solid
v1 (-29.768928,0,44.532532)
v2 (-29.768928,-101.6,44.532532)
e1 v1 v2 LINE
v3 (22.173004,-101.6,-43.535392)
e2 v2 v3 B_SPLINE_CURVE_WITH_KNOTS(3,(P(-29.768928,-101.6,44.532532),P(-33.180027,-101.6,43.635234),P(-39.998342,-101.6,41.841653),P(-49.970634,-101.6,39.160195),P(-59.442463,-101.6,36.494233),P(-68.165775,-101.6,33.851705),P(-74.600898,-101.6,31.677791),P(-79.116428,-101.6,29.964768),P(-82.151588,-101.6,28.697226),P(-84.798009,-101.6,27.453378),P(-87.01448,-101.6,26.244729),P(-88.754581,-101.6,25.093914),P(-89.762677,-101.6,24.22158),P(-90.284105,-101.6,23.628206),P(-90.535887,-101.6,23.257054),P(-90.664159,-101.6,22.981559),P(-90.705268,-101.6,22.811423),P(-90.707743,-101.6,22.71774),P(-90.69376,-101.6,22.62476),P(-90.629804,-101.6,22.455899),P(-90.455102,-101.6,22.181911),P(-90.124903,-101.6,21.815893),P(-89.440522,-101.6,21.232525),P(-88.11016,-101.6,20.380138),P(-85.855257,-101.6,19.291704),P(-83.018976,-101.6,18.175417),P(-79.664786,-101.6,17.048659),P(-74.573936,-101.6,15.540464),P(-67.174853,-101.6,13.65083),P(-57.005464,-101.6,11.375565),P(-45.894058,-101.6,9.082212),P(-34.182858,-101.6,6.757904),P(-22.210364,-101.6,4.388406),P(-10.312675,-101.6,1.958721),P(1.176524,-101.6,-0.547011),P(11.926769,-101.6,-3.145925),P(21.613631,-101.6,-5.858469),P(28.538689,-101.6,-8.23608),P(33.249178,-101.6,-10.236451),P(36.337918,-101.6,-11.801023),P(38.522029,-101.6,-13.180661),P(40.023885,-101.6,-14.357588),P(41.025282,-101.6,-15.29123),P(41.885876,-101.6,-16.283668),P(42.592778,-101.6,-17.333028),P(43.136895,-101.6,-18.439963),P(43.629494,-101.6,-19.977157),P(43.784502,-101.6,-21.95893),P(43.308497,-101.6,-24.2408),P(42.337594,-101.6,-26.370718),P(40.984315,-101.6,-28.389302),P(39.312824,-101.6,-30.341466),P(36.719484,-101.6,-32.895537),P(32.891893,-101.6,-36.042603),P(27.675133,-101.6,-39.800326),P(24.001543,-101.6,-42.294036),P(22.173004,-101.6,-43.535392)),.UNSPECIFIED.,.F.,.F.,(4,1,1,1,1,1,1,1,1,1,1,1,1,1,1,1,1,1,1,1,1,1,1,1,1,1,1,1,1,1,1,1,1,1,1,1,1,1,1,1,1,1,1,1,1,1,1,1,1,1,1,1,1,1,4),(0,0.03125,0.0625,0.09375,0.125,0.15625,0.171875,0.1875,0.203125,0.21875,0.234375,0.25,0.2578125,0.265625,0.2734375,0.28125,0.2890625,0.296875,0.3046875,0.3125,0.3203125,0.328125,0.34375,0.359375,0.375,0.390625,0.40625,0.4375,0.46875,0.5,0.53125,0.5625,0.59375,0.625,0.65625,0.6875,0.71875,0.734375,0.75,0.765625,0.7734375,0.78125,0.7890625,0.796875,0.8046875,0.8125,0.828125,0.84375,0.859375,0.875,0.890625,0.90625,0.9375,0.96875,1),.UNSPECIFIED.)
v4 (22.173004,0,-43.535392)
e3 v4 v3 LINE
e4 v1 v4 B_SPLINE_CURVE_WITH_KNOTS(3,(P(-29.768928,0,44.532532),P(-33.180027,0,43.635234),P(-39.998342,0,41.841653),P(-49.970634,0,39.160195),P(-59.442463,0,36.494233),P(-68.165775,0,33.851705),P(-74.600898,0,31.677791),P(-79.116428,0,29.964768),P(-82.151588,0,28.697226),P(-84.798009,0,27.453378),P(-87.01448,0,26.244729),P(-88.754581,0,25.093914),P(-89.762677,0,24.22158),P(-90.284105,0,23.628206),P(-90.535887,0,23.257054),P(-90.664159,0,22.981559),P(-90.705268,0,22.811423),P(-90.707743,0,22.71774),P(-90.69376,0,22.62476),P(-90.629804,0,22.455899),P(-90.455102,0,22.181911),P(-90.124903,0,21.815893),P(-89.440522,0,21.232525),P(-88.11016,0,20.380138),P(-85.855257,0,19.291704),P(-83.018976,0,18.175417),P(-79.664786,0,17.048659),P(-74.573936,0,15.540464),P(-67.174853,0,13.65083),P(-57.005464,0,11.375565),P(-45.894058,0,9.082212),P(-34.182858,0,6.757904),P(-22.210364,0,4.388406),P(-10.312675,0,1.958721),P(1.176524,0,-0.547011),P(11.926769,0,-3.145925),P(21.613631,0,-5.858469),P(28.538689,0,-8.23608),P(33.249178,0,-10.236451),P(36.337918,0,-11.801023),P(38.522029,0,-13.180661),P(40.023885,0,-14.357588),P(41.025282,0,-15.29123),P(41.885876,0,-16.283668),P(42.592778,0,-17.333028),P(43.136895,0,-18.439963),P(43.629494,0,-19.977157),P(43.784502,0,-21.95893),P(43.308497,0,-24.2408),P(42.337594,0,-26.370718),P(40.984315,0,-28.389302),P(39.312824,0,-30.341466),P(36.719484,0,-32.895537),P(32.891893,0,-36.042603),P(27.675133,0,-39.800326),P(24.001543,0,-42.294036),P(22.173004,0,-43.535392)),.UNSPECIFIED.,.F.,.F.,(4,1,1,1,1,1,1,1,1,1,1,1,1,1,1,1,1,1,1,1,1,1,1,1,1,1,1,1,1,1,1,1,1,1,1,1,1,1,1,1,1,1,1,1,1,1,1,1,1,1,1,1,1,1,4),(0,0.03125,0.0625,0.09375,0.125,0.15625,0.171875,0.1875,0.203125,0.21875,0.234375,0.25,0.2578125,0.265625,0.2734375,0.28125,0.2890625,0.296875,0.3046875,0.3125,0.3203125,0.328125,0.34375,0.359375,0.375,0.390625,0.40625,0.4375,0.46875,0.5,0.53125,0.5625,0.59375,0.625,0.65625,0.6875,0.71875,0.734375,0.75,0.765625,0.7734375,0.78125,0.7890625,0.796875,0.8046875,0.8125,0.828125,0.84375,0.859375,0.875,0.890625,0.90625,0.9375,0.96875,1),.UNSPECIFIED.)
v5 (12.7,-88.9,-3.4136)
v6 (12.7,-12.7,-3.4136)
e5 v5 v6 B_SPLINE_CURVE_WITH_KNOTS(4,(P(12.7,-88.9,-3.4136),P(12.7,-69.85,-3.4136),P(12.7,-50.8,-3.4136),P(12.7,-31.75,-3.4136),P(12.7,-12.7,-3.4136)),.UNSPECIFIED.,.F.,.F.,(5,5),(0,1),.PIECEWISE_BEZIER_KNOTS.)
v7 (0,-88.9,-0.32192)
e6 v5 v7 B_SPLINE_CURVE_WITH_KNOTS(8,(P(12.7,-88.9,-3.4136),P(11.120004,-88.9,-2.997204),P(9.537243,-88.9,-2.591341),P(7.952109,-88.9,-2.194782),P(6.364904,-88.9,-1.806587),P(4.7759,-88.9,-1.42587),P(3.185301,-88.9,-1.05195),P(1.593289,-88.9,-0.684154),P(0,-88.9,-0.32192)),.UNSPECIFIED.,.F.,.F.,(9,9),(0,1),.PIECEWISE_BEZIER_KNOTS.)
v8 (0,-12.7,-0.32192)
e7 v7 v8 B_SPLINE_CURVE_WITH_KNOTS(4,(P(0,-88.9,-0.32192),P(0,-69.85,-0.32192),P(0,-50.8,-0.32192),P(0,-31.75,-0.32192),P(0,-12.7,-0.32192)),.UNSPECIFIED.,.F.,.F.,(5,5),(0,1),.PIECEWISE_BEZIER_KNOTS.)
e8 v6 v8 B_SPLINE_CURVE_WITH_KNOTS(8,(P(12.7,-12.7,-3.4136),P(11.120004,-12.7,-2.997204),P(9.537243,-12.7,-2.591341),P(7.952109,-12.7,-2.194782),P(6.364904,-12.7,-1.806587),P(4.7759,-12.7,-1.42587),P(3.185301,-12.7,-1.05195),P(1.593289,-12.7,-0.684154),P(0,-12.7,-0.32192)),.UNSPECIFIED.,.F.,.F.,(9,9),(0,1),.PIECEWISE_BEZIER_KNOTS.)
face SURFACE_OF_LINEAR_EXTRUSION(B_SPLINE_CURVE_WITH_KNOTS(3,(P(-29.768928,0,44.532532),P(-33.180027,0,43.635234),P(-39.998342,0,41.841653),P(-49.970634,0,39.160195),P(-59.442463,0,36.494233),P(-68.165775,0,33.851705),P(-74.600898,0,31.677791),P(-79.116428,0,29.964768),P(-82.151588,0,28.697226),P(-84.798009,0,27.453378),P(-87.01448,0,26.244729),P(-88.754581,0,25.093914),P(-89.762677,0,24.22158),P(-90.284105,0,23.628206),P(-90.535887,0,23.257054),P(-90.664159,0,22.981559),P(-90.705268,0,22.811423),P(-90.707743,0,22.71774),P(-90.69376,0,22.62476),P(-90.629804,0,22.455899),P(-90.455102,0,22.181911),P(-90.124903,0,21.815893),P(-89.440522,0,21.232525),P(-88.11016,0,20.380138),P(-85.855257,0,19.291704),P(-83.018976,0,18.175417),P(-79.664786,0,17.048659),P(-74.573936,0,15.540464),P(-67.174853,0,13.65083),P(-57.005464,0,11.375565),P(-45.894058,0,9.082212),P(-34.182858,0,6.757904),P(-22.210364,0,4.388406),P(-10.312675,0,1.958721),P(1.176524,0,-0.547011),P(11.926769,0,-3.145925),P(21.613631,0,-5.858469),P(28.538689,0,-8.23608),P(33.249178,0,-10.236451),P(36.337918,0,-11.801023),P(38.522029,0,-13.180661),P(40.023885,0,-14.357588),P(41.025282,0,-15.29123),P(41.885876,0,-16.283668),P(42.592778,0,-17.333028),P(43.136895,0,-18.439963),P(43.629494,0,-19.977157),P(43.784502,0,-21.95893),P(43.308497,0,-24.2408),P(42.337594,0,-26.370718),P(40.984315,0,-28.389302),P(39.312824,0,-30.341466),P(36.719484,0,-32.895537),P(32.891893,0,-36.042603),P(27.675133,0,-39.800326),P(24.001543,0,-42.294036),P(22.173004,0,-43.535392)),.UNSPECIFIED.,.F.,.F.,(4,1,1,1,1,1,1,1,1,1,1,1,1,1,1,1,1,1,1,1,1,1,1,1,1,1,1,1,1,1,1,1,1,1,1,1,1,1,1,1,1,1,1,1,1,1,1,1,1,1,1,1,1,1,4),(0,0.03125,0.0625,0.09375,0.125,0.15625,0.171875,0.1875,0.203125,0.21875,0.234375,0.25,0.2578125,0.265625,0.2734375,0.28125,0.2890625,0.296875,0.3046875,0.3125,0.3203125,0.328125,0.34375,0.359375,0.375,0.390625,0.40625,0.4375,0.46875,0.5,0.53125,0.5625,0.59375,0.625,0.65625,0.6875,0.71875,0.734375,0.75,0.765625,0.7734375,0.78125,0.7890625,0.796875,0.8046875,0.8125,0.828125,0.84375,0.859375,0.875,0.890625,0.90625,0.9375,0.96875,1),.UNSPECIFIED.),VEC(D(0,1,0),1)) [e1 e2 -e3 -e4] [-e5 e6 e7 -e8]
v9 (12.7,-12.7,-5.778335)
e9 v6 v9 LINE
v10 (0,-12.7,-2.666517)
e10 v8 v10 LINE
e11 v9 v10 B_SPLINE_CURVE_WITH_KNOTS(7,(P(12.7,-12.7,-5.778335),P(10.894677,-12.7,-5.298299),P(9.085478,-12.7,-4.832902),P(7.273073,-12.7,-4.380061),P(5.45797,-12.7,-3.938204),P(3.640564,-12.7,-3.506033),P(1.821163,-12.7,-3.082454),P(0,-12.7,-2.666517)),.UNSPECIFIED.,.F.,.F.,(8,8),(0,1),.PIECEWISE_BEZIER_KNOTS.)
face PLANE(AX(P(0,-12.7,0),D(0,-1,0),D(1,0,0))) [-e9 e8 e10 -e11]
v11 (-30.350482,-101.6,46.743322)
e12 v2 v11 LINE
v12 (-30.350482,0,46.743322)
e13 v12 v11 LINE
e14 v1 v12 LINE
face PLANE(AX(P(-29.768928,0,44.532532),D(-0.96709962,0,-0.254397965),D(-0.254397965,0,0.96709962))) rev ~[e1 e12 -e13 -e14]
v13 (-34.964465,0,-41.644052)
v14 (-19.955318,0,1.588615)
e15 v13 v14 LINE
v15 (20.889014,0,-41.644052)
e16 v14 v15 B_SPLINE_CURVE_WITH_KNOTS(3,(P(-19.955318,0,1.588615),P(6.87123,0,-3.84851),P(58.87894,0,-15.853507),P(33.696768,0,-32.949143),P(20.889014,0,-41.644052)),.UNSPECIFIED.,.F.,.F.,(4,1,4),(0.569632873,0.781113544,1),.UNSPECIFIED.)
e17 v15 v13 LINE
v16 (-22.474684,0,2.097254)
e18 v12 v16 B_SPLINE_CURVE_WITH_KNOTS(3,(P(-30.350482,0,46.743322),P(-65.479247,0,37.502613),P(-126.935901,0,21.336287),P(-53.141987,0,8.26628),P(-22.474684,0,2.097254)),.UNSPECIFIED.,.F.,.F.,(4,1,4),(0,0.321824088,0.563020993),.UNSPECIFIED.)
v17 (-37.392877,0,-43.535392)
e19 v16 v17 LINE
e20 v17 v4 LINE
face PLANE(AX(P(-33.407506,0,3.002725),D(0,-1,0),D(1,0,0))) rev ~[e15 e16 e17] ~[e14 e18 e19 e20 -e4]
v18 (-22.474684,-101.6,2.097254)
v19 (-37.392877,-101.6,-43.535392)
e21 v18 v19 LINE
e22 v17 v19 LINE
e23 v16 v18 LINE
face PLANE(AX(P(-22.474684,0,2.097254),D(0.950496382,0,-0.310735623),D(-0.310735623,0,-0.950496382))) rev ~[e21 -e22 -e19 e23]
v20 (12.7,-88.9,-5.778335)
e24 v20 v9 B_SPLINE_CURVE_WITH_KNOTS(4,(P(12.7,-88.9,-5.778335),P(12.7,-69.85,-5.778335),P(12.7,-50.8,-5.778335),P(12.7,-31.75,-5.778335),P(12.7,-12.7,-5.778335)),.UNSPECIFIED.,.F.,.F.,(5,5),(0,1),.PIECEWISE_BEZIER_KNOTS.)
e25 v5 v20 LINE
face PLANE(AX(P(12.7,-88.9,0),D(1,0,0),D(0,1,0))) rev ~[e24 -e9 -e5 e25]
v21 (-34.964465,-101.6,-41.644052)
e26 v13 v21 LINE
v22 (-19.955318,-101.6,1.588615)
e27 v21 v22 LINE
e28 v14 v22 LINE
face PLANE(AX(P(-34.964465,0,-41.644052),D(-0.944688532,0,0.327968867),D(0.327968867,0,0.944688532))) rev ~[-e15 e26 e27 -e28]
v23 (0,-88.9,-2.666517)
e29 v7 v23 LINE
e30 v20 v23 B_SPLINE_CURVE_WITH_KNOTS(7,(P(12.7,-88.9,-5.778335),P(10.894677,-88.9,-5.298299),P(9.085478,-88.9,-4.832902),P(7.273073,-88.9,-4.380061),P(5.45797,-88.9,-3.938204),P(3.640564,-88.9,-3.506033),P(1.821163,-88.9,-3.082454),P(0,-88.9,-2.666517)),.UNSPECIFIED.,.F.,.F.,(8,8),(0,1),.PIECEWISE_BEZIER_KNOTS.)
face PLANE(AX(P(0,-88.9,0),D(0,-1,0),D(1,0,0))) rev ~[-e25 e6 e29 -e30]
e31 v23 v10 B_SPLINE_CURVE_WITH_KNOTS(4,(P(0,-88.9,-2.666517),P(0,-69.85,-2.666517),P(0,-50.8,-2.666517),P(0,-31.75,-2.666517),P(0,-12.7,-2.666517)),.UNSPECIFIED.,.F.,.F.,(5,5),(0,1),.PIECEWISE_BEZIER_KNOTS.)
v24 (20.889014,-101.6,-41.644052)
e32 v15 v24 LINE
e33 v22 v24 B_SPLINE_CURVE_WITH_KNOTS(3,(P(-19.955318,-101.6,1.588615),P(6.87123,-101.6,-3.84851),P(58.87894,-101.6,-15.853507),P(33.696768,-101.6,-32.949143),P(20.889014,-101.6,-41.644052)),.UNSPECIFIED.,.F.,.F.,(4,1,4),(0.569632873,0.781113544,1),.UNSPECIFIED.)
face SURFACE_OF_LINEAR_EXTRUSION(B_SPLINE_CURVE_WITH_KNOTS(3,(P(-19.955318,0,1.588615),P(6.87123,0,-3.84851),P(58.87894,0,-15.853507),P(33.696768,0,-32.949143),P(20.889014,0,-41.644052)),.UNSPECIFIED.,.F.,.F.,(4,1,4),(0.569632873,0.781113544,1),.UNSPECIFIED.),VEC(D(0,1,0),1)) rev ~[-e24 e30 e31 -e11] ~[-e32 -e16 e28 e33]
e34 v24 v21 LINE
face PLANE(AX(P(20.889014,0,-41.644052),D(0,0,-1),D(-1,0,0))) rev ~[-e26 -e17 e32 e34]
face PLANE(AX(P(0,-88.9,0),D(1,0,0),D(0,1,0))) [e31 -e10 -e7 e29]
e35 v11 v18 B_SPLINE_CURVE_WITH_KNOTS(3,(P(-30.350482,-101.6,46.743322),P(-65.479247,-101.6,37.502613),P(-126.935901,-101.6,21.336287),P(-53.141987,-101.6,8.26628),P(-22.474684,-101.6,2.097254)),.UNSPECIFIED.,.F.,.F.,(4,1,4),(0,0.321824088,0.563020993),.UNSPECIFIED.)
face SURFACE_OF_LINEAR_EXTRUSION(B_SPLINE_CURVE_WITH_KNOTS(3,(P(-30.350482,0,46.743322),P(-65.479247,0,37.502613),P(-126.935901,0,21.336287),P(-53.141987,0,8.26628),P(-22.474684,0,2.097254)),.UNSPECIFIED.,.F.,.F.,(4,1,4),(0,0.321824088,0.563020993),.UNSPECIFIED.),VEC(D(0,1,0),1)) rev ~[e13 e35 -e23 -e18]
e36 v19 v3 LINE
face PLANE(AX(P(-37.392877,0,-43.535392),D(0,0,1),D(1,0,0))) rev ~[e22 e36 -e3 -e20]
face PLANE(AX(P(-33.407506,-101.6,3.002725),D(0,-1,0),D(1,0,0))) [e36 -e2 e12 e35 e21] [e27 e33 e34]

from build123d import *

# Parameters (mm, degrees)
F1_DEPTH = 101.6
F2_W     = 12.7
F2_H     = 76.2
F3_DEPTH = 25.4


# Not quite as in the source:
# - the dataset's text gives a spline's control points without its knots; the knots are read off the source's solid


with BuildPart() as f1:
    # F0 (on Front) → F1 (new body)
    with BuildSketch(Plane.XZ):
        with BuildLine():
            Line((-29.7689282068, 44.5325319117), (-30.3504820913, 46.7433221638))
            add(Edge.make_bspline(
                [(-30.3504820913, 46.7433221638), (-65.4792465579, 37.5026131401), (-126.9359011048, 21.3362870293), (-53.1419871092, 8.2662800236), (-22.4746837858, 2.097254196)],
                knots=[0, 0, 0, 0, 0.3218240885, 0.5630209925, 0.5630209925, 0.5630209925, 0.5630209925], degree=3))
            Line((-22.4746837858, 2.097254196), (-37.3928770423, -43.5353918503))
            Line((-37.3928770423, -43.5353918503), (22.1730041869, -43.5353918503))
            add(Edge.make_bspline(
                [(-29.7689282068, 44.5325319117), (-33.1800274027, 43.6352337688), (-39.998341745, 41.8416533056), (-49.9706338774, 39.160194504), (-59.4424633937, 36.494232515), (-68.1657748481, 33.8517051844), (-74.6008981086, 31.6777905715), (-79.1164276054, 29.964768348), (-82.151587871, 28.6972263494), (-84.7980091363, 27.4533776691), (-87.014479639, 26.2447291833), (-88.7545811685, 25.0939135409), (-89.7626771944, 24.2215801126), (-90.2841053939, 23.6282062584), (-90.5358874781, 23.2570539545), (-90.6641591658, 22.9815588437), (-90.7052678374, 22.8114230075), (-90.7077430294, 22.7177398154), (-90.6937600848, 22.6247603025), (-90.6298038157, 22.4558990126), (-90.4551017544, 22.1819113739), (-90.1249027626, 21.8158928441), (-89.4405221889, 21.2325249423), (-88.1101599753, 20.3801381613), (-85.8552568912, 19.2917040843), (-83.0189760989, 18.1754171095), (-79.6647858948, 17.0486594734), (-74.5739362939, 15.5404642857), (-67.1748533538, 13.6508299997), (-57.005464278, 11.375565199), (-45.8940580008, 9.0822116846), (-34.182858287, 6.7579039526), (-22.2103642832, 4.3884059772), (-10.3126752643, 1.958720781), (1.1765238168, -0.5470106193), (11.9267687798, -3.1459247063), (21.613631095, -5.858469164), (28.5386885644, -8.2360797133), (33.2491780436, -10.2364505596), (36.3379175047, -11.8010225513), (38.5220292101, -13.1806613757), (40.0238851524, -14.3575877569), (41.025282446, -15.2912304345), (41.885875849, -16.2836675268), (42.5927779455, -17.3330279302), (43.1368949429, -18.4399632147), (43.6294941624, -19.9771565027), (43.7845017363, -21.9589304675), (43.3084967659, -24.2408004362), (42.3375941541, -26.37071833), (40.9843153221, -28.3893021336), (39.3128239767, -30.3414661856), (36.7194836379, -32.8955374316), (32.8918930664, -36.0426029128), (27.6751327821, -39.80032588), (24.0015427317, -42.2940363483), (22.1730041869, -43.5353918503)],
                knots=[0, 0, 0, 0, 0.03125, 0.0625, 0.09375, 0.125, 0.15625, 0.171875, 0.1875, 0.203125, 0.21875, 0.234375, 0.25, 0.2578125, 0.265625, 0.2734375, 0.28125, 0.2890625, 0.296875, 0.3046875, 0.3125, 0.3203125, 0.328125, 0.34375, 0.359375, 0.375, 0.390625, 0.40625, 0.4375, 0.46875, 0.5, 0.53125, 0.5625, 0.59375, 0.625, 0.65625, 0.6875, 0.71875, 0.734375, 0.75, 0.765625, 0.7734375, 0.78125, 0.7890625, 0.796875, 0.8046875, 0.8125, 0.828125, 0.84375, 0.859375, 0.875, 0.890625, 0.90625, 0.9375, 0.96875, 1, 1, 1, 1], degree=3))
        make_face()
        with BuildLine():
            Line((-34.9644646049, -41.644051671), (-19.9553178139, 1.588615424))
            add(Edge.make_bspline(
                [(-19.9553178139, 1.588615424), (6.871230209, -3.8485104187), (58.8789404783, -15.8535074244), (33.6967682905, -32.9491426714), (20.8890140057, -41.644051671)],
                knots=[0.5696328726, 0.5696328726, 0.5696328726, 0.5696328726, 0.7811135442, 1, 1, 1, 1], degree=3))
            Line((20.8890140057, -41.644051671), (-34.9644646049, -41.644051671))
        make_face(mode=Mode.SUBTRACT)
    extrude(amount=F1_DEPTH)

    # F2 (on Top) → F3 (cut)
    with BuildSketch(Plane.XY):
        with Locations((6.35, -50.8)):
            Rectangle(F2_W, F2_H)
    extrude(amount=-F3_DEPTH, mode=Mode.SUBTRACT)


solid = f1.part
